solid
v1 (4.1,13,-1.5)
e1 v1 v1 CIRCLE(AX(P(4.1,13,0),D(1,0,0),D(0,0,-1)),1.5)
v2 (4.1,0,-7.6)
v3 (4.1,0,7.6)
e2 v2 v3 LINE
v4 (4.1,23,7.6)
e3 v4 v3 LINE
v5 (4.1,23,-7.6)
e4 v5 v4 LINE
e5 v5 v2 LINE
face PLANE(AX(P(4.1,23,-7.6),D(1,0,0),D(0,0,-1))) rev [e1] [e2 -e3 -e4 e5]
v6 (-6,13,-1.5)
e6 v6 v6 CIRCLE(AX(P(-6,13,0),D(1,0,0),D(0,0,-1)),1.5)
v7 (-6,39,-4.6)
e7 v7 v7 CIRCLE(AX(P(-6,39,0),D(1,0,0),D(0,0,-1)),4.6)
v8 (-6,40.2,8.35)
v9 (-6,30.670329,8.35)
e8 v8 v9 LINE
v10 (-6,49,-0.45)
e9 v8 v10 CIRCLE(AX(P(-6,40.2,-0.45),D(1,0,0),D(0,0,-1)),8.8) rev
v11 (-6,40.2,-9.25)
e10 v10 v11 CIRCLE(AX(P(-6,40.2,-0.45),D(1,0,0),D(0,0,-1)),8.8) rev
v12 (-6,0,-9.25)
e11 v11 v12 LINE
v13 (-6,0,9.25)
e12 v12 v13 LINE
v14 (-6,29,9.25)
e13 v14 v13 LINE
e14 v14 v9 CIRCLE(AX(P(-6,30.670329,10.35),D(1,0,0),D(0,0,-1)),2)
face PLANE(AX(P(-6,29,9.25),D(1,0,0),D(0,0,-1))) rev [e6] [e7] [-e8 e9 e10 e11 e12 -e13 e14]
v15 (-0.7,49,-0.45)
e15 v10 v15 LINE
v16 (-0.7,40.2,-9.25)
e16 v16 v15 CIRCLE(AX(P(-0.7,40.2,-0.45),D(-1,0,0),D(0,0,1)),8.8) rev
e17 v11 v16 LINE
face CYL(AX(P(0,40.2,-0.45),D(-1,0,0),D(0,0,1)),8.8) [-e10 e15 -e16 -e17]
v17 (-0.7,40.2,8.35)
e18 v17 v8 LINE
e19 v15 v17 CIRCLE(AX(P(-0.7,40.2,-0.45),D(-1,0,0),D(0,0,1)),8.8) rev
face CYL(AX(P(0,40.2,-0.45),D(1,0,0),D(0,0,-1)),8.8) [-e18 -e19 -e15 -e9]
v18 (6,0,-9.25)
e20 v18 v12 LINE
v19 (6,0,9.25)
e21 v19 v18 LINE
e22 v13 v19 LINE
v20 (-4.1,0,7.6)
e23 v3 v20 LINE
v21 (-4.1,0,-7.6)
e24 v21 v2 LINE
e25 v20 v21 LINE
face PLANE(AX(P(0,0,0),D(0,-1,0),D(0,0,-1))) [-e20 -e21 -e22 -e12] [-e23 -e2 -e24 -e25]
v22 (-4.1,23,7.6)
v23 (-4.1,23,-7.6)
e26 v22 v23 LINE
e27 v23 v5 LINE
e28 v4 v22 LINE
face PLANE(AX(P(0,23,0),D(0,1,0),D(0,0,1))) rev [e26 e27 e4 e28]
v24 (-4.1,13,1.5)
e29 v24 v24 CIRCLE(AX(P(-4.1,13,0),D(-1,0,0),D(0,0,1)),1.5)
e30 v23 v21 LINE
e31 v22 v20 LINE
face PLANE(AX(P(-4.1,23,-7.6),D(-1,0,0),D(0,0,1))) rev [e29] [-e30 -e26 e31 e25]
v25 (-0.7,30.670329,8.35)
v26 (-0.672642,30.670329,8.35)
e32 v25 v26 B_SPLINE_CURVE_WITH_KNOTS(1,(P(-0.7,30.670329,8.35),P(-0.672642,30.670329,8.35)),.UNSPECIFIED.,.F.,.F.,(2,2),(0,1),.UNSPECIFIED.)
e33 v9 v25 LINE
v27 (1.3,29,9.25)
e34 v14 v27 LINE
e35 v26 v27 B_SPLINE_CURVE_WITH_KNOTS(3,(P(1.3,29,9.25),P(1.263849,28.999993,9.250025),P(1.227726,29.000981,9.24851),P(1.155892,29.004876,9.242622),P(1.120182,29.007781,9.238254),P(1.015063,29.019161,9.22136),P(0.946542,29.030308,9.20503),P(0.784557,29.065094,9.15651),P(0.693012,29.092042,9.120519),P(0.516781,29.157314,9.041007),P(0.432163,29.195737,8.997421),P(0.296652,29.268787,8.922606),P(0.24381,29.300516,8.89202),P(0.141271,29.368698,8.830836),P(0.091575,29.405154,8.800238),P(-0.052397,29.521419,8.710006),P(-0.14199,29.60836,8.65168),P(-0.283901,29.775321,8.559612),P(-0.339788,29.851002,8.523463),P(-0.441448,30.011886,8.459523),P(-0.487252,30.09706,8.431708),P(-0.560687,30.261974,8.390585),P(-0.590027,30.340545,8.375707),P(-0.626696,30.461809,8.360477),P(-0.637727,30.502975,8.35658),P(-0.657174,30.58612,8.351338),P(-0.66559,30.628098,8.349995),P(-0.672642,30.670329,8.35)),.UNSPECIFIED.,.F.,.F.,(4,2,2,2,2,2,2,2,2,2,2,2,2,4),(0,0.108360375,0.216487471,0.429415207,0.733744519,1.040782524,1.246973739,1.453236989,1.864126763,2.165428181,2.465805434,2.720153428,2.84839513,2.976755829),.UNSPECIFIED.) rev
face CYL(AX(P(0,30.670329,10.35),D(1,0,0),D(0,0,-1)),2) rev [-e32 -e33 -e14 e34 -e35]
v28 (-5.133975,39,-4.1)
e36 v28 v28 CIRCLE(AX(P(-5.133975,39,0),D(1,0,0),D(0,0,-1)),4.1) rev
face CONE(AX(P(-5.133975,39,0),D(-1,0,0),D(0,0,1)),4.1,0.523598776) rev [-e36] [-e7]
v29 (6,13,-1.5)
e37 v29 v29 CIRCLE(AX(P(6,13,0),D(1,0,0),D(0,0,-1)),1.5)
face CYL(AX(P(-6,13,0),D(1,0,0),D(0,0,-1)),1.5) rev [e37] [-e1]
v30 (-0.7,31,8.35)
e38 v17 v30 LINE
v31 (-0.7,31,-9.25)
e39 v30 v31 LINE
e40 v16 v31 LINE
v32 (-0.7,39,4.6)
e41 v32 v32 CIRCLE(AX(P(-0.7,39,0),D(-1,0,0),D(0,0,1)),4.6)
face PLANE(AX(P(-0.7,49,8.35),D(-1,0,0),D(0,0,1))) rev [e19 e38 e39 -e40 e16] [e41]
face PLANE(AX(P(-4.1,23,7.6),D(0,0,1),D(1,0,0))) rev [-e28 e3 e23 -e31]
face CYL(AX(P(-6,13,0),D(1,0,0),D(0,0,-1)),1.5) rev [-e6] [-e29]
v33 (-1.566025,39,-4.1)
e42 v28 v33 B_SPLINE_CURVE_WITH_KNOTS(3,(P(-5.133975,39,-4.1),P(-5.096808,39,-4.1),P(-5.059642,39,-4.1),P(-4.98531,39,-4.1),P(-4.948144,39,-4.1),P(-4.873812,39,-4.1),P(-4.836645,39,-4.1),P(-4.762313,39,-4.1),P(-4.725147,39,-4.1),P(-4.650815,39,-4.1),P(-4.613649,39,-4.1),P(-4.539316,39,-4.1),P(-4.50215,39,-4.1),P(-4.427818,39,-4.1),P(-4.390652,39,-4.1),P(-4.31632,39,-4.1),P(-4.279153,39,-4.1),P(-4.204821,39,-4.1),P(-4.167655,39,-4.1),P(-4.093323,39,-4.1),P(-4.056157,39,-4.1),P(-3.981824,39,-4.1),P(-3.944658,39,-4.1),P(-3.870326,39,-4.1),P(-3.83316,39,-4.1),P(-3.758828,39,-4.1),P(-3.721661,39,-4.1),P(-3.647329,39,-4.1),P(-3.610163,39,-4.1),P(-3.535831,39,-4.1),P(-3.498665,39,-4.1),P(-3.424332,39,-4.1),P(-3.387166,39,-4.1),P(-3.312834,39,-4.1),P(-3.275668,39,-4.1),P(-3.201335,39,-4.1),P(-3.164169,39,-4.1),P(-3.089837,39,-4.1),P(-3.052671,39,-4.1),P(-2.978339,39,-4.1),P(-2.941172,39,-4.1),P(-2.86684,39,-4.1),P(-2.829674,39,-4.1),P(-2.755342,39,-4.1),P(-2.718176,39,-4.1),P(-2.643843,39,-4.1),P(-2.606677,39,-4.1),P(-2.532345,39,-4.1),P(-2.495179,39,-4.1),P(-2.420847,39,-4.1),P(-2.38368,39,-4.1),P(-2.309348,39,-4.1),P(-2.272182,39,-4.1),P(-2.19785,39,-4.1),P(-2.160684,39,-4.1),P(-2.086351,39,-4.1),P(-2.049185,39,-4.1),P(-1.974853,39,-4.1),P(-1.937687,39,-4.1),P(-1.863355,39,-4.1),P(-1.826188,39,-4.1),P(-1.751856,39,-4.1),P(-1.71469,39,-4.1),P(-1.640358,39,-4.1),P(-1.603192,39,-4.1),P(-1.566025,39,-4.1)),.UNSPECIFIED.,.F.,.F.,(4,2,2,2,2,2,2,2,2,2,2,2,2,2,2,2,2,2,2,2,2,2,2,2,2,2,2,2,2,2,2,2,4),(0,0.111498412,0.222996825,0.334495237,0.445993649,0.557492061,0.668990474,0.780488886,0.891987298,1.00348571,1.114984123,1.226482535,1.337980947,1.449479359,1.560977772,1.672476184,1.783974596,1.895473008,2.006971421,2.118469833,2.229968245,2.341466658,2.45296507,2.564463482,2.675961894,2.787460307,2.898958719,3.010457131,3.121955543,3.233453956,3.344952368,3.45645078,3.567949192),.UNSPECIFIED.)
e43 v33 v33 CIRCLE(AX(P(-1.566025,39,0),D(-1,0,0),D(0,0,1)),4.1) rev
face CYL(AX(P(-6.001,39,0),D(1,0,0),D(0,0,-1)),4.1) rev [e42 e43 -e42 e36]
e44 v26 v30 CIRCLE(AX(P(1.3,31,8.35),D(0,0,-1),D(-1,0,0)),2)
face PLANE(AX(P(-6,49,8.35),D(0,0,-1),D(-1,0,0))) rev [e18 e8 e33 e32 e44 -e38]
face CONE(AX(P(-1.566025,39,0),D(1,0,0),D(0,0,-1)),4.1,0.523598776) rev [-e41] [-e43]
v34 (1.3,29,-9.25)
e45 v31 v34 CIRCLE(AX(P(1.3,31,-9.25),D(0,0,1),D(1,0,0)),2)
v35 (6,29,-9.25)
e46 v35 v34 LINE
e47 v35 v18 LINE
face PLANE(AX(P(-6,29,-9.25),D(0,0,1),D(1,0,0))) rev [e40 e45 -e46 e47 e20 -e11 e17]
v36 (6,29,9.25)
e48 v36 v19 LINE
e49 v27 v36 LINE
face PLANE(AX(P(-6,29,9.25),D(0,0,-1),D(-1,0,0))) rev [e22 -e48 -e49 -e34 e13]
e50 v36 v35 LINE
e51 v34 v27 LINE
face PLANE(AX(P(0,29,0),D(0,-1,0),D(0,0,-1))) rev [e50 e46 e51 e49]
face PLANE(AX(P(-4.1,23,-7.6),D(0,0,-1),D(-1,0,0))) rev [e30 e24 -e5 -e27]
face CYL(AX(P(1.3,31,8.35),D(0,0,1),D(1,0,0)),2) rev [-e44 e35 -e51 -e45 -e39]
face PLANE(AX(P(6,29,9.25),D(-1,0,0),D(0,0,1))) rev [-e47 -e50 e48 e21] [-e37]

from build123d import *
from OCP.BRepFilletAPI import BRepFilletAPI_MakeChamfer

# Parameters (mm, degrees)
SKETCH1_W           = 12
SKETCH1_H           = 18.5
BOSS_EXTRUDE1_DEPTH = 29
SKETCH2_W           = 8.2
SKETCH2_H           = 15.2
CUT_EXTRUDE1_DEPTH  = 23
SKETCH4_W           = 5.3
SKETCH4_H           = 17.6
BOSS_EXTRUDE2_DEPTH = 20
CUT_EXTRUDE2_REACH  = 52.314
SKETCH5_R           = 4.1
FILLET1_R           = 8.8
SKETCH6_R           = 1.5
CUT_EXTRUDE3_DEPTH  = 52.289009544
CHAMFER1_SIZE       = 0.5
CHAMFER1_SIZE2      = 0.866025404
FILLET6_R           = 2


# Some blends are built 0.0001 mm under size
with BuildPart() as part:
    # Sketch1 → Boss-Extrude1 (new body)
    with BuildSketch(Plane(origin=(0, 0, 0), x_dir=(1, 0, 0), z_dir=(0, 1, 0))):
        Rectangle(SKETCH1_W, SKETCH1_H)
    extrude(amount=BOSS_EXTRUDE1_DEPTH)

    # Sketch2 → Cut-Extrude1 (cut)
    with BuildSketch(Plane.XZ):
        Rectangle(SKETCH2_W, SKETCH2_H)
    extrude(amount=-CUT_EXTRUDE1_DEPTH, mode=Mode.SUBTRACT)

    # Sketch4 → Boss-Extrude2 (add)
    with BuildSketch(Plane(origin=(0, 29, 0), x_dir=(1, 0, 0), z_dir=(0, 1, 0))):
        with Locations((-3.35, 0.45)):
            Rectangle(SKETCH4_W, SKETCH4_H)
    extrude(amount=BOSS_EXTRUDE2_DEPTH)

    # Sketch5 → Cut-Extrude2 (cut, up to next)
    with BuildSketch(Plane(origin=(-0.7, 0, 0), x_dir=(0, 0, -1), z_dir=(1, 0, 0)), mode=Mode.PRIVATE) as cut_extrude2_sk1:
        with Locations((0, 39)):
            Circle(SKETCH5_R)
    cut_extrude2_tool1 = extrude(cut_extrude2_sk1.sketch, amount=-CUT_EXTRUDE2_REACH, mode=Mode.PRIVATE) & part.part
    add(cut_extrude2_tool1.solids().sort_by_distance((-0.7, 39, 0))[0], mode=Mode.SUBTRACT)

    # Fillet1
    fillet1_edges = [part.edges().sort_by_distance(p)[0] for p in [
        (-3.35, 49, -9.25),
        (-3.35, 49, 8.35),
    ]]
    fillet(fillet1_edges, radius=FILLET1_R - 0.0001)  # a hair under: the kernel refuses the full size

    # Sketch6 → Cut-Extrude3 (cut, through all)
    with BuildSketch(Plane(origin=(6, 0, 0), x_dir=(0, 0, -1), z_dir=(1, 0, 0))):
        with Locations((0, 13)):
            Circle(SKETCH6_R)
    extrude(amount=-CUT_EXTRUDE3_DEPTH, mode=Mode.SUBTRACT)

    # Chamfer1: one chamfer whose edges measure the first distance from different faces: ONE call of the kernel's chamfer builder (chamfer() names one face for all edges)
    chamfer1_edges_1 = [part.edges().sort_by_distance(p)[0] for p in [
        (-0.7, 39, 4.1),
    ]]
    chamfer1_side_1 = [part.faces().sort_by_distance(p)[0] for p in [
        (-0.7, 34.60005, 8.083586787),
    ]]
    chamfer1_edges_2 = [part.edges().sort_by_distance(p)[0] for p in [
        (-6, 39, 4.1),
    ]]
    chamfer1_side_2 = [part.faces().sort_by_distance(p)[0] for p in [
        (-6, 22.369672876, -0.180344797),
    ]]
    chamfer1 = BRepFilletAPI_MakeChamfer(part.part.solid().wrapped)
    for e in chamfer1_edges_1:
        chamfer1.Add(CHAMFER1_SIZE, CHAMFER1_SIZE2, e.wrapped, chamfer1_side_1[0].wrapped)  # the first distance lies on this face
    for e in chamfer1_edges_2:
        chamfer1.Add(CHAMFER1_SIZE, CHAMFER1_SIZE2, e.wrapped, chamfer1_side_2[0].wrapped)  # the first distance lies on this face
    add(Compound.cast(chamfer1.Shape()), mode=Mode.REPLACE)

    # Fillet6
    # the kernel refuses this fillet: 2 mm, written as the material it adds along each edge
    with BuildSketch(Plane(origin=(-0.7, 29, 8.35), x_dir=(1, 0, 0), z_dir=(0, 0, -1))) as fillet6_piece_1:
        with BuildLine():
            CenterArc((FILLET6_R, -FILLET6_R), FILLET6_R, 90, 90)
            Line((0, -FILLET6_R), (-FILLET6_R * 0.02, -FILLET6_R))
            Line((-FILLET6_R * 0.02, -FILLET6_R), (-FILLET6_R * 0.02, FILLET6_R * 0.02))
            Line((-FILLET6_R * 0.02, FILLET6_R * 0.02), (FILLET6_R, FILLET6_R * 0.02))
            Line((FILLET6_R, FILLET6_R * 0.02), (FILLET6_R, 0))
        make_face()
    extrude(amount=17.6)
    with BuildSketch(Plane(origin=(-6, 29, 8.35), x_dir=(0, 1.5316143415257847e-12, 1.0), z_dir=(1, 0, 0))) as fillet6_piece_2:
        with BuildLine():
            CenterArc((2, -1.670329309), FILLET6_R, 123.367012969, 56.632987031)
            Line((0, -1.670329309), (-0.04, -1.670329309))
            Line((-0.04, -1.670329309), (-0.04, 0))
            Line((-0.04, 0), (0, 0.04))
            ThreePointArc((0, 0.04), (0.45, 0.04), (0.878, 0.033406586))
            Line((0.878, 0.033406586), (0.9, 0))
        make_face()
    extrude(amount=5.3)
    with BuildSketch(Plane(origin=(-6, 29, 8.35), x_dir=(0, 1.5316143415257847e-12, 1.0), z_dir=(1, 0, 0))) as fillet6_piece_3a_section:
        with BuildLine():
            CenterArc((2, -1.670329309), FILLET6_R, 123.367012969, 56.632987031)
            Line((0, -1.670329309), (-0.04, -1.670329309))
            Line((-0.04, -1.670329309), (-0.04, 0))
            Line((-0.04, 0), (0, 0.04))
            ThreePointArc((0, 0.04), (0.45, 0.04), (0.878, 0.033406586))
            Line((0.878, 0.033406586), (0.9, 0))
        make_face()
    fillet6_piece_3a = extrude(amount=9.475823272, mode=Mode.PRIVATE)
    fillet6_piece_3a = split(fillet6_piece_3a, bisect_by=Plane(origin=(-0.7, 29.423174299, 8.582221018), z_dir=(1, 0, 0)), keep=Keep.TOP, mode=Mode.PRIVATE)
    with BuildSketch(Plane(origin=(-0.7, 29, 13.35), x_dir=(1, 0, 0), z_dir=(0, 0, -1))) as fillet6_piece_3b_section:
        with BuildLine():
            CenterArc((FILLET6_R, -FILLET6_R), FILLET6_R, 90, 90)
            Line((0, -FILLET6_R), (-FILLET6_R * 0.02, -FILLET6_R))
            Line((-FILLET6_R * 0.02, -FILLET6_R), (-FILLET6_R * 0.02, FILLET6_R * 0.02))
            Line((-FILLET6_R * 0.02, FILLET6_R * 0.02), (FILLET6_R, FILLET6_R * 0.02))
            Line((FILLET6_R, FILLET6_R * 0.02), (FILLET6_R, 0))
        make_face()
    fillet6_piece_3b = extrude(amount=22.6, mode=Mode.PRIVATE)
    fillet6_piece_3b = split(fillet6_piece_3b, bisect_by=Plane(origin=(-0.247209771, 29.452790229, 9.25), z_dir=(0, 0, -1)), keep=Keep.TOP, mode=Mode.PRIVATE)
    fillet6_piece_3b = split(fillet6_piece_3b, bisect_by=Plane(origin=(-0.247209771, 29.452790229, 8.35), z_dir=(0, 0, 1)), keep=Keep.TOP, mode=Mode.PRIVATE)
    fillet6_piece_3 = fillet6_piece_3a & fillet6_piece_3b
    add(fillet6_piece_3)


solid = part.part
